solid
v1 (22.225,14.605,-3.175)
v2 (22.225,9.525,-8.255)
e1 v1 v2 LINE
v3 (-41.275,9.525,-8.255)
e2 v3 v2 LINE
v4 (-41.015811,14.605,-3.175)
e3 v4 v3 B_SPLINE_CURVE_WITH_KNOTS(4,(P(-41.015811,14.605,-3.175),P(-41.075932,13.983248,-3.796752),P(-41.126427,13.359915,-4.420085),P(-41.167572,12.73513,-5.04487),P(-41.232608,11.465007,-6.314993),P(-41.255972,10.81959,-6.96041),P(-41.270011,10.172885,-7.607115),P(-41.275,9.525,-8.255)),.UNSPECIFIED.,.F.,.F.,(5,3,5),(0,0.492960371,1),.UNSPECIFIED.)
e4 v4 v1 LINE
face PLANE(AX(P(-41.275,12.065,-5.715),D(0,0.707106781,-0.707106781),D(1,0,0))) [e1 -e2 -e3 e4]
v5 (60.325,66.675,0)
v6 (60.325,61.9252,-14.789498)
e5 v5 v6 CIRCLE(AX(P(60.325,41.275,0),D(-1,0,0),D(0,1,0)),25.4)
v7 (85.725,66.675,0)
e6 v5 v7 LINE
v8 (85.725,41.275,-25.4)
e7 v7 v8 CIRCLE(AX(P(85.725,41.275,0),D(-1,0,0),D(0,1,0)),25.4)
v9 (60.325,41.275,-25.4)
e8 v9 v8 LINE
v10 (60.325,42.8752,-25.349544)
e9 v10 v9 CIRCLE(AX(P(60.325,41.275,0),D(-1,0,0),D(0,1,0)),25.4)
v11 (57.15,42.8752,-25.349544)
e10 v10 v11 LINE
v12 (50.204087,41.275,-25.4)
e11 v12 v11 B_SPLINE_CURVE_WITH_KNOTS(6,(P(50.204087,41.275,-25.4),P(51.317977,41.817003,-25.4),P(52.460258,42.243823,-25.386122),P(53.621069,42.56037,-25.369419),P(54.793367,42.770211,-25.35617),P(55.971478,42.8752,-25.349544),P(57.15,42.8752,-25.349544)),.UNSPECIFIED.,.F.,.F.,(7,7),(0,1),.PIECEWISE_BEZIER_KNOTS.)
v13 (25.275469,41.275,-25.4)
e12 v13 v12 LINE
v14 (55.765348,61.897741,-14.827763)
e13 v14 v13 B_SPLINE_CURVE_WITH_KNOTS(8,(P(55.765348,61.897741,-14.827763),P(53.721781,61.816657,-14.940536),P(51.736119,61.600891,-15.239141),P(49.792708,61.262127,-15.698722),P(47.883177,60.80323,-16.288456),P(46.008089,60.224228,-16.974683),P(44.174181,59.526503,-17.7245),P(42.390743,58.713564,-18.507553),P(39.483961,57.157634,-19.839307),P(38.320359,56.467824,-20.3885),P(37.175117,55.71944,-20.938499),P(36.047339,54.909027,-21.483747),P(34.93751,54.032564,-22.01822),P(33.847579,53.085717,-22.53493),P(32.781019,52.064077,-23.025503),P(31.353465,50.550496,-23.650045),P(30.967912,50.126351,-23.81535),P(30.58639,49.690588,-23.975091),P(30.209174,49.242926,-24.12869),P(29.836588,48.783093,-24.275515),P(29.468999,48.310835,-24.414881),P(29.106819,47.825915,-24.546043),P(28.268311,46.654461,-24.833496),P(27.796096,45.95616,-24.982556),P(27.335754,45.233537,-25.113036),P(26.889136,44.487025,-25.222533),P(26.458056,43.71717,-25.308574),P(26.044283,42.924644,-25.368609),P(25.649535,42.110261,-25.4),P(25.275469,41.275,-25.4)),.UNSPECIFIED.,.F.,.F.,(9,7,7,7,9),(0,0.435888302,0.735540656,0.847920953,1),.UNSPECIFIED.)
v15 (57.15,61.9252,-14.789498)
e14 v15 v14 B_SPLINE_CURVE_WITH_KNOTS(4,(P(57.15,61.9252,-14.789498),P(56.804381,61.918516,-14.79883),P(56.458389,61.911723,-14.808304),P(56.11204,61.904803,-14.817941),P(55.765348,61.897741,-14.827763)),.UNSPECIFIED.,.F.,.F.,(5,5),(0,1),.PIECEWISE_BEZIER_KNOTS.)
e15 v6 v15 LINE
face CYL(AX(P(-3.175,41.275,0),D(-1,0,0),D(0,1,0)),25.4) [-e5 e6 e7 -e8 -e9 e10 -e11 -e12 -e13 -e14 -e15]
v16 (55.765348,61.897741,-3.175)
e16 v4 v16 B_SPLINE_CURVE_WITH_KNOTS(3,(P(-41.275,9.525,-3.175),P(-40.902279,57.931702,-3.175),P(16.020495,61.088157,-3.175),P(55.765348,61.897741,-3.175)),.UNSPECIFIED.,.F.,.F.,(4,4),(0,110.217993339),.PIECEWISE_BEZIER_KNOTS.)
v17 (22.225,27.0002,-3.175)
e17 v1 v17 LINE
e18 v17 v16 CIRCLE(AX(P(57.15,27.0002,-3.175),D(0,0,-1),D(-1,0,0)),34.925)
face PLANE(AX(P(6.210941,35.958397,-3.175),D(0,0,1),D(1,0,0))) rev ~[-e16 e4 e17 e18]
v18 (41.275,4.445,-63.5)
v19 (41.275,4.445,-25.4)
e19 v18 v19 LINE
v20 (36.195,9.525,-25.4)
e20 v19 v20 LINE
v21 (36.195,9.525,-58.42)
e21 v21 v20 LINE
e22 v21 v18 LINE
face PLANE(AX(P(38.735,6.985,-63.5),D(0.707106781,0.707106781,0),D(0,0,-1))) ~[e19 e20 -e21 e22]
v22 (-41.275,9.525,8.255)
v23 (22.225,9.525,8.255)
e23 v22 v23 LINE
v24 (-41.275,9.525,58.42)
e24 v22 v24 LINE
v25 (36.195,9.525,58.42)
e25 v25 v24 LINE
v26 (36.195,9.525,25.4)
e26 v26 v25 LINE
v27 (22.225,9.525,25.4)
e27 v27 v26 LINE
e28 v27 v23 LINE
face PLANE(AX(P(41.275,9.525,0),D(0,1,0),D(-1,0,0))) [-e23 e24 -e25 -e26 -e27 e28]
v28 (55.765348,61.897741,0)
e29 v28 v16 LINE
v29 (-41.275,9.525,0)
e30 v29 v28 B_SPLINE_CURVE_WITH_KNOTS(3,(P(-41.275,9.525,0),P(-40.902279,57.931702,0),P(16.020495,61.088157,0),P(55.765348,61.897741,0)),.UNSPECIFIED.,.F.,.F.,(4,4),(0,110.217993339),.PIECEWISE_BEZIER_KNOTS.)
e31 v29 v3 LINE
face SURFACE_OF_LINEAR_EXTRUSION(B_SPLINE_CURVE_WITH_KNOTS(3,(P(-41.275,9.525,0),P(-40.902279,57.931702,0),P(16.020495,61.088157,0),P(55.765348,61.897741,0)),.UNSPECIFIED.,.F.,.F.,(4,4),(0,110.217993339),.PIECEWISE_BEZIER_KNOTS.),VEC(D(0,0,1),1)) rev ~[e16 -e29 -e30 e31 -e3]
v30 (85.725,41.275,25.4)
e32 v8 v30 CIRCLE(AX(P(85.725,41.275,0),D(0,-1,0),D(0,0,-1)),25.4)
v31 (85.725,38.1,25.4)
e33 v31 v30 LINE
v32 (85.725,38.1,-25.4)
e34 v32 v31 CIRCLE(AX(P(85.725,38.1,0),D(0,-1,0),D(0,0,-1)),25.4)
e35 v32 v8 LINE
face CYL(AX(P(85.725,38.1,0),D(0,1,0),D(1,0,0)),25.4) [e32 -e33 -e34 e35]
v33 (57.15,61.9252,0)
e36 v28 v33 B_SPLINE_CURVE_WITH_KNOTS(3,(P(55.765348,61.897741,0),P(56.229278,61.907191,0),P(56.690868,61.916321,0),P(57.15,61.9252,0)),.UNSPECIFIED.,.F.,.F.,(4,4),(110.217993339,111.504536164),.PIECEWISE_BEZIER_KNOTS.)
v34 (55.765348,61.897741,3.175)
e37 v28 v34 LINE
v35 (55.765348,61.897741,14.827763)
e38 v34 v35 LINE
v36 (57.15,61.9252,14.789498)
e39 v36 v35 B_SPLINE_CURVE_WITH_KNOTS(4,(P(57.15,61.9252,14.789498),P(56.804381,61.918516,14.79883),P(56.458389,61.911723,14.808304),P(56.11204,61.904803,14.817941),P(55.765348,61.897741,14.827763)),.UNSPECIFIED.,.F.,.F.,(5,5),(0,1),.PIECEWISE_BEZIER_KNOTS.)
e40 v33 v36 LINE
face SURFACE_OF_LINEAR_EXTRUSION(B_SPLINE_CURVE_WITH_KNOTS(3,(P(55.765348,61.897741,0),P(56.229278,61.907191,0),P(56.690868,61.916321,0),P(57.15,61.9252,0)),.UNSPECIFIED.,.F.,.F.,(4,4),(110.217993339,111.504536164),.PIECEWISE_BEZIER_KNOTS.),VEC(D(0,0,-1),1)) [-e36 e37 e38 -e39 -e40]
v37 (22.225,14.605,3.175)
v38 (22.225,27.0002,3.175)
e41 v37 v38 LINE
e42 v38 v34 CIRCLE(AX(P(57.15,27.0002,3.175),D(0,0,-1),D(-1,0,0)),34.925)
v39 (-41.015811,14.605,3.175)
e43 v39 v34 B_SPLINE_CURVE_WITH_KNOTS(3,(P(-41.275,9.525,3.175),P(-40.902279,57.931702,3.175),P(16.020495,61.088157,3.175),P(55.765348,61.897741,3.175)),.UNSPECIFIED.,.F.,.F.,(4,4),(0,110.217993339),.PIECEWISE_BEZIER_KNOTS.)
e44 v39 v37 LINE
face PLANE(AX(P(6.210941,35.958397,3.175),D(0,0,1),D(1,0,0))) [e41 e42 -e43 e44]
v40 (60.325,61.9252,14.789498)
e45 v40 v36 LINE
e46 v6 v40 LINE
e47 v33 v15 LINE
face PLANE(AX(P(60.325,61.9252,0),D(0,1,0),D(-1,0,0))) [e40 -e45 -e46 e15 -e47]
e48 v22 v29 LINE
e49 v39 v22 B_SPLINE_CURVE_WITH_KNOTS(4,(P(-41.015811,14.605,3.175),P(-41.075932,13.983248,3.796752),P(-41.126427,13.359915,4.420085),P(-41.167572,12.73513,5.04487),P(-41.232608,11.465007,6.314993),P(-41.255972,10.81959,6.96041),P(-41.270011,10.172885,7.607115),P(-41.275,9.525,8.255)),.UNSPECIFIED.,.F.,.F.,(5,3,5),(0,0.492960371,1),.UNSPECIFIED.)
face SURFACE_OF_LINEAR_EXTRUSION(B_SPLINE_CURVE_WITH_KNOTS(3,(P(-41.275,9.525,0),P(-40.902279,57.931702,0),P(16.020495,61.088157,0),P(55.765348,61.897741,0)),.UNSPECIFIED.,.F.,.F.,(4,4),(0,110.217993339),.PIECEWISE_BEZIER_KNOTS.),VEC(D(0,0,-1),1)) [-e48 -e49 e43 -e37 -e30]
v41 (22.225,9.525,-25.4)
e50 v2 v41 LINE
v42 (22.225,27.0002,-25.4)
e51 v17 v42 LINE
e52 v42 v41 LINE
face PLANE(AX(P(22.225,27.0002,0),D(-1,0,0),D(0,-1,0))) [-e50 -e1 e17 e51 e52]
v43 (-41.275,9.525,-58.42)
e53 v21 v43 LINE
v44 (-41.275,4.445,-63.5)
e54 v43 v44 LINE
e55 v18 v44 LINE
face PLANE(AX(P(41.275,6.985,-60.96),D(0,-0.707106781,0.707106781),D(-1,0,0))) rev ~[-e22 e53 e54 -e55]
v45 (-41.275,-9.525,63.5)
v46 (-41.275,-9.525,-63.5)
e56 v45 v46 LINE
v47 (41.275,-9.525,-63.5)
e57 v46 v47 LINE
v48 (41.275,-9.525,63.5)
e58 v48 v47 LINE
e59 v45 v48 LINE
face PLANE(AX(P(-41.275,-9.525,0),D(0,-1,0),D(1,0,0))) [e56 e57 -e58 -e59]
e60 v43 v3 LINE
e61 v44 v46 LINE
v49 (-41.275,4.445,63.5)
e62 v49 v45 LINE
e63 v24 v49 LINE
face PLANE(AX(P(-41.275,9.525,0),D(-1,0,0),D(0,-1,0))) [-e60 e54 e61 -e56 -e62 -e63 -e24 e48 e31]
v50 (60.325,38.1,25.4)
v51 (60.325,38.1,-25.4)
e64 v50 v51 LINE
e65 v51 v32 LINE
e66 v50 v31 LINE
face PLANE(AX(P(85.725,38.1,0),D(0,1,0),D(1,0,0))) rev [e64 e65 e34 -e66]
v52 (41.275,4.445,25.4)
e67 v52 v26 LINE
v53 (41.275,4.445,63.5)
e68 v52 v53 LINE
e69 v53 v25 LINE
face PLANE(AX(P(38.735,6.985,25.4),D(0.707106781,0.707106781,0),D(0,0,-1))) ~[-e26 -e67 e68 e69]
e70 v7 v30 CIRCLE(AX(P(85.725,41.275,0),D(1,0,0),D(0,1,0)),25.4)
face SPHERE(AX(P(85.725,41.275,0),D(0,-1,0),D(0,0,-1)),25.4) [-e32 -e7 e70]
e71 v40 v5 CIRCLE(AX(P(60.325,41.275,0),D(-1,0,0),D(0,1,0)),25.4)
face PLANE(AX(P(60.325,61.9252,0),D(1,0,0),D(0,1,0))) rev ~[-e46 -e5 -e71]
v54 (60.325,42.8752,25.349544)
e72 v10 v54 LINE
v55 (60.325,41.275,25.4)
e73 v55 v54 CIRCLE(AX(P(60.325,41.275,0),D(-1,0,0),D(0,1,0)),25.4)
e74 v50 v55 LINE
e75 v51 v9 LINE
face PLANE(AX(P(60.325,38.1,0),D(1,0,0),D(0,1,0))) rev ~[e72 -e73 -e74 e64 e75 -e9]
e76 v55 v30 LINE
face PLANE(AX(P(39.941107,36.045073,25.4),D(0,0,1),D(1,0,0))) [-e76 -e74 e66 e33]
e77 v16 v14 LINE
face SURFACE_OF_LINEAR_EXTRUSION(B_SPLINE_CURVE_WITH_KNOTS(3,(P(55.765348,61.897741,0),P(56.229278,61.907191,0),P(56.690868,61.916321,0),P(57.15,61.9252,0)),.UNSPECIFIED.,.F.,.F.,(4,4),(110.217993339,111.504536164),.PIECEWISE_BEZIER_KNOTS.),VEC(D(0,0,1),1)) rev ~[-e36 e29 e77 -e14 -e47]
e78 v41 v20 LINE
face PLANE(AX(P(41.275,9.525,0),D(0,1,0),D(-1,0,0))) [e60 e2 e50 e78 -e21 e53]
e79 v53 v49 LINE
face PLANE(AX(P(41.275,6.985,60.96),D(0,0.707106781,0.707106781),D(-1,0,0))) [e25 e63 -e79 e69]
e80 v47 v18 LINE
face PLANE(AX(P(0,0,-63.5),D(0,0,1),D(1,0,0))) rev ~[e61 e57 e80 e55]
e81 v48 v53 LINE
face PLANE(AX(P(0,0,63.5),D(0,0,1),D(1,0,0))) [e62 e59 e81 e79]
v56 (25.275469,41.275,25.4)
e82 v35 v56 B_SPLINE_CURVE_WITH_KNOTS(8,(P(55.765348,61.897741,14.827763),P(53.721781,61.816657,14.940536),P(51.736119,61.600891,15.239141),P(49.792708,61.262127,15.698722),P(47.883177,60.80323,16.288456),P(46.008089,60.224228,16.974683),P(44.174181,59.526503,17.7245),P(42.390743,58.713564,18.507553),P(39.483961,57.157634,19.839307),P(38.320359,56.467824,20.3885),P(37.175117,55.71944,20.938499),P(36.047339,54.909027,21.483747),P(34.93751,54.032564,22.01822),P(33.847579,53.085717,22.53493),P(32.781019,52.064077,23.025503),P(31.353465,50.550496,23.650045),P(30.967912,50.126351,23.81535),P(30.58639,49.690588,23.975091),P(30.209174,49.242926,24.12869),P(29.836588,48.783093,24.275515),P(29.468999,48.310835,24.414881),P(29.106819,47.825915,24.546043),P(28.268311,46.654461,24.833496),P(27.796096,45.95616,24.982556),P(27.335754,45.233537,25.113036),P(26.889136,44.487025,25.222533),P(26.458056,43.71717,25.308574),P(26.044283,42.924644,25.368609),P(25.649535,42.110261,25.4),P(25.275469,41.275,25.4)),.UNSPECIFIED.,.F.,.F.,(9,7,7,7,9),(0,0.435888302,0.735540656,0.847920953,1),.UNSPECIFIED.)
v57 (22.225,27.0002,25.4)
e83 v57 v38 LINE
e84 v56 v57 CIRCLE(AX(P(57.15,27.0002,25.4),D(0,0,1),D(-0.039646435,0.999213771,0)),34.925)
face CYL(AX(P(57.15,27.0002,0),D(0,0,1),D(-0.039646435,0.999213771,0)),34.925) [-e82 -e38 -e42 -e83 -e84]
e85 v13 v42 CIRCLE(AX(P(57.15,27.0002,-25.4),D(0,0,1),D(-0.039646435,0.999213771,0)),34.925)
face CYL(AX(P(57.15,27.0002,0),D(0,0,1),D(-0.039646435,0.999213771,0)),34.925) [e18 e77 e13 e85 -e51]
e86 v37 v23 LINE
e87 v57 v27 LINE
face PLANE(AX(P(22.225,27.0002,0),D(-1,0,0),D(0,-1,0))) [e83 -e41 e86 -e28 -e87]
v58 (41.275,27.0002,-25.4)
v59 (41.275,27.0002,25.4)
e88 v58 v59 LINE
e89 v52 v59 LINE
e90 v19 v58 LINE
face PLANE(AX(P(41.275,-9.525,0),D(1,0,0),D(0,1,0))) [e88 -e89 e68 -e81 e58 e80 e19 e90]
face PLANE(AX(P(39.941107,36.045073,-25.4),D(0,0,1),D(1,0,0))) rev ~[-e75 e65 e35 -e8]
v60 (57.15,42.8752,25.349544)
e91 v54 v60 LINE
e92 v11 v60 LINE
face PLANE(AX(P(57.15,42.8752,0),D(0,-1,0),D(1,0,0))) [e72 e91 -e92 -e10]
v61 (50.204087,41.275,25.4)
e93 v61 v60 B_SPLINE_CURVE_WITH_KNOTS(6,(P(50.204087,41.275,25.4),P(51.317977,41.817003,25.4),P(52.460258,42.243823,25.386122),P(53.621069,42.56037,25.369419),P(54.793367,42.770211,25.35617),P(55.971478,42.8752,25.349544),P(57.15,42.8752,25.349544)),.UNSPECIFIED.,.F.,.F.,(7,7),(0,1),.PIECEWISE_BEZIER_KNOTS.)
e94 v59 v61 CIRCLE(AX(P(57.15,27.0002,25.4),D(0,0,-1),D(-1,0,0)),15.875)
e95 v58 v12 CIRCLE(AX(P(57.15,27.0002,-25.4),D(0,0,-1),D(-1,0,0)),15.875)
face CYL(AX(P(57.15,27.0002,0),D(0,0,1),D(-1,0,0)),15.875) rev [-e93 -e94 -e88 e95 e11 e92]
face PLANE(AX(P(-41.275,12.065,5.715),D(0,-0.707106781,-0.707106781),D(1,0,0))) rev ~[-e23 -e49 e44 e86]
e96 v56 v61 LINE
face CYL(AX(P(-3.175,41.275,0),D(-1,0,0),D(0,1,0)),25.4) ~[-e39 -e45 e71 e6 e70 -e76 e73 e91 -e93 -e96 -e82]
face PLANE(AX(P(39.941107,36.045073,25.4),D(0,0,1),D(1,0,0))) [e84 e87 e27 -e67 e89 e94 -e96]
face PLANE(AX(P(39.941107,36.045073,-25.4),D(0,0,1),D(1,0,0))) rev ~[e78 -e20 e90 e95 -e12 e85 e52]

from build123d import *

# Parameters (mm, degrees)
F1_DEPTH    = 63.5
F0_W        = 25.4
F0_H        = 19.05
F0_H_2      = 4.7752
F0_H_3      = 4.7498
F2_DEPTH    = 25.4
F3_DEPTH    = 3.175
F5_T1_DEPTH = 88.9
F5_T4_ANGLE = 180
F6_SIZE     = 5.08


# Not quite as in the source:
# - a fillet or chamfer that OpenCascade refuses, or shapes differently, is made with other operations: its cross-section is extruded or revolved along the edge and cut away or added


with BuildPart() as f1:
    # F0 (on Top) → F1 (new body, symmetric)
    with BuildSketch(Plane.XY):
        Polygon((41.275, -9.525), (41.275, 9.525), (22.225, 9.525), (-41.275, 9.525), (-41.275, -9.525), align=None)
    extrude(amount=F1_DEPTH, both=True)

    # F0 (on Top) → F2 (join, symmetric)
    with BuildSketch(Plane.XY):
        with BuildLine():
            Line((22.225, 9.525), (41.275, 9.525))
            Line((41.275, 9.525), (41.275, 27.0002))
            ThreePointArc((41.275, 27.0002), (45.9246798487, 38.2255201513), (57.15, 42.8752))
            Line((57.15, 42.8752), (60.325, 42.8752))
            Line((60.325, 42.8752), (60.325, 61.9252))
            Line((60.325, 61.9252), (57.15, 61.9252))
            add(Edge.make_bspline(
                [(55.7653482616, 61.897740953), (56.229278457, 61.90719099), (56.6908681229, 61.9163212607), (57.15, 61.9252)],
                knots=[110.2179933389, 110.2179933389, 110.2179933389, 110.2179933389, 111.5045361635, 111.5045361635, 111.5045361635, 111.5045361635], degree=3))
            ThreePointArc((55.7653482616, 61.897740953), (31.9695056943, 51.2014051666), (22.225, 27.0002))
            Line((22.225, 27.0002), (22.225, 9.525))
        make_face()
        with Locations((73.025, 52.4002)):
            Rectangle(F0_W, F0_H)
        with Locations((73.025, 40.4876)):
            Rectangle(F0_W, F0_H_2)
        with Locations((73.025, 64.3001)):
            Rectangle(F0_W, F0_H_3)
    extrude(amount=F2_DEPTH, both=True)

    # F0 (on Top) → F3 (join, symmetric)
    with BuildSketch(Plane.XY):
        with BuildLine():
            Line((-41.275, 9.525), (22.225, 9.525))
            Line((22.225, 9.525), (22.225, 27.0002))
            ThreePointArc((22.225, 27.0002), (31.9695056943, 51.2014051666), (55.7653482616, 61.897740953))
            add(Edge.make_bspline(
                [(-41.275, 9.525), (-40.9022788448, 57.9317022513), (16.0204954638, 61.0881572363), (55.7653482616, 61.897740953)],
                knots=[0, 0, 0, 0, 110.2179933389, 110.2179933389, 110.2179933389, 110.2179933389], degree=3))
        make_face()
    extrude(amount=F3_DEPTH, both=True)

    # F0 (on Top) → F4 (revolve)
    with BuildSketch(Plane.XY):
        Polygon((85.725, 61.9252), (85.725, 42.8752), (85.725, 38.1), (111.125, 38.1), (111.125, 66.675), (85.725, 66.675), align=None)
    revolve(axis=Axis((85.725, 52.3875, 0), (0, 1, 0)))

    # F5: fillet of radius 25.4 on 1 edges, made by hand

    # F5_s2 → F5_t1 (cut)
    with BuildSketch(Plane.YZ.offset(-3.175)):
        with BuildLine():
            ThreePointArc((66.675, 0), (59.2355122421, -17.9605122421), (41.275, -25.4))
            Line((41.275, -25.4), (66.675, -25.4))
            Line((66.675, -25.4), (66.675, 0))
        make_face()
        with BuildLine():
            ThreePointArc((66.675, 0), (59.2355122421, 17.9605122421), (41.275, 25.4))
            Line((41.275, 25.4), (66.675, 25.4))
            Line((66.675, 25.4), (66.675, 0))
        make_face()
    extrude(amount=F5_T1_DEPTH, mode=Mode.SUBTRACT)

    # F5_s3 → F5_t4 (revolve, cut)
    with BuildSketch(Plane.YZ.offset(85.725)):
        with BuildLine():
            ThreePointArc((66.675, 0), (59.2355122421, -17.9605122421), (41.275, -25.4))
            Line((41.275, -25.4), (66.675, -25.4))
            Line((66.675, -25.4), (66.675, 0))
        make_face()
    revolve(axis=Axis((85.725, 66.675, 0), (0, -1, 0)), revolution_arc=F5_T4_ANGLE, mode=Mode.SUBTRACT)

    # F6
    f6_edges = [f1.edges().sort_by_distance(p)[0] for p in [
        (-9.525, 9.525, 3.175),
        (-9.525, 9.525, -3.175),
        (0, 9.525, -63.5),
        (41.275, 9.525, -44.45),
        (41.275, 9.525, 44.45),
        (0, 9.525, 63.5),
    ]]
    chamfer(f6_edges, length=F6_SIZE)


solid = f1.part
